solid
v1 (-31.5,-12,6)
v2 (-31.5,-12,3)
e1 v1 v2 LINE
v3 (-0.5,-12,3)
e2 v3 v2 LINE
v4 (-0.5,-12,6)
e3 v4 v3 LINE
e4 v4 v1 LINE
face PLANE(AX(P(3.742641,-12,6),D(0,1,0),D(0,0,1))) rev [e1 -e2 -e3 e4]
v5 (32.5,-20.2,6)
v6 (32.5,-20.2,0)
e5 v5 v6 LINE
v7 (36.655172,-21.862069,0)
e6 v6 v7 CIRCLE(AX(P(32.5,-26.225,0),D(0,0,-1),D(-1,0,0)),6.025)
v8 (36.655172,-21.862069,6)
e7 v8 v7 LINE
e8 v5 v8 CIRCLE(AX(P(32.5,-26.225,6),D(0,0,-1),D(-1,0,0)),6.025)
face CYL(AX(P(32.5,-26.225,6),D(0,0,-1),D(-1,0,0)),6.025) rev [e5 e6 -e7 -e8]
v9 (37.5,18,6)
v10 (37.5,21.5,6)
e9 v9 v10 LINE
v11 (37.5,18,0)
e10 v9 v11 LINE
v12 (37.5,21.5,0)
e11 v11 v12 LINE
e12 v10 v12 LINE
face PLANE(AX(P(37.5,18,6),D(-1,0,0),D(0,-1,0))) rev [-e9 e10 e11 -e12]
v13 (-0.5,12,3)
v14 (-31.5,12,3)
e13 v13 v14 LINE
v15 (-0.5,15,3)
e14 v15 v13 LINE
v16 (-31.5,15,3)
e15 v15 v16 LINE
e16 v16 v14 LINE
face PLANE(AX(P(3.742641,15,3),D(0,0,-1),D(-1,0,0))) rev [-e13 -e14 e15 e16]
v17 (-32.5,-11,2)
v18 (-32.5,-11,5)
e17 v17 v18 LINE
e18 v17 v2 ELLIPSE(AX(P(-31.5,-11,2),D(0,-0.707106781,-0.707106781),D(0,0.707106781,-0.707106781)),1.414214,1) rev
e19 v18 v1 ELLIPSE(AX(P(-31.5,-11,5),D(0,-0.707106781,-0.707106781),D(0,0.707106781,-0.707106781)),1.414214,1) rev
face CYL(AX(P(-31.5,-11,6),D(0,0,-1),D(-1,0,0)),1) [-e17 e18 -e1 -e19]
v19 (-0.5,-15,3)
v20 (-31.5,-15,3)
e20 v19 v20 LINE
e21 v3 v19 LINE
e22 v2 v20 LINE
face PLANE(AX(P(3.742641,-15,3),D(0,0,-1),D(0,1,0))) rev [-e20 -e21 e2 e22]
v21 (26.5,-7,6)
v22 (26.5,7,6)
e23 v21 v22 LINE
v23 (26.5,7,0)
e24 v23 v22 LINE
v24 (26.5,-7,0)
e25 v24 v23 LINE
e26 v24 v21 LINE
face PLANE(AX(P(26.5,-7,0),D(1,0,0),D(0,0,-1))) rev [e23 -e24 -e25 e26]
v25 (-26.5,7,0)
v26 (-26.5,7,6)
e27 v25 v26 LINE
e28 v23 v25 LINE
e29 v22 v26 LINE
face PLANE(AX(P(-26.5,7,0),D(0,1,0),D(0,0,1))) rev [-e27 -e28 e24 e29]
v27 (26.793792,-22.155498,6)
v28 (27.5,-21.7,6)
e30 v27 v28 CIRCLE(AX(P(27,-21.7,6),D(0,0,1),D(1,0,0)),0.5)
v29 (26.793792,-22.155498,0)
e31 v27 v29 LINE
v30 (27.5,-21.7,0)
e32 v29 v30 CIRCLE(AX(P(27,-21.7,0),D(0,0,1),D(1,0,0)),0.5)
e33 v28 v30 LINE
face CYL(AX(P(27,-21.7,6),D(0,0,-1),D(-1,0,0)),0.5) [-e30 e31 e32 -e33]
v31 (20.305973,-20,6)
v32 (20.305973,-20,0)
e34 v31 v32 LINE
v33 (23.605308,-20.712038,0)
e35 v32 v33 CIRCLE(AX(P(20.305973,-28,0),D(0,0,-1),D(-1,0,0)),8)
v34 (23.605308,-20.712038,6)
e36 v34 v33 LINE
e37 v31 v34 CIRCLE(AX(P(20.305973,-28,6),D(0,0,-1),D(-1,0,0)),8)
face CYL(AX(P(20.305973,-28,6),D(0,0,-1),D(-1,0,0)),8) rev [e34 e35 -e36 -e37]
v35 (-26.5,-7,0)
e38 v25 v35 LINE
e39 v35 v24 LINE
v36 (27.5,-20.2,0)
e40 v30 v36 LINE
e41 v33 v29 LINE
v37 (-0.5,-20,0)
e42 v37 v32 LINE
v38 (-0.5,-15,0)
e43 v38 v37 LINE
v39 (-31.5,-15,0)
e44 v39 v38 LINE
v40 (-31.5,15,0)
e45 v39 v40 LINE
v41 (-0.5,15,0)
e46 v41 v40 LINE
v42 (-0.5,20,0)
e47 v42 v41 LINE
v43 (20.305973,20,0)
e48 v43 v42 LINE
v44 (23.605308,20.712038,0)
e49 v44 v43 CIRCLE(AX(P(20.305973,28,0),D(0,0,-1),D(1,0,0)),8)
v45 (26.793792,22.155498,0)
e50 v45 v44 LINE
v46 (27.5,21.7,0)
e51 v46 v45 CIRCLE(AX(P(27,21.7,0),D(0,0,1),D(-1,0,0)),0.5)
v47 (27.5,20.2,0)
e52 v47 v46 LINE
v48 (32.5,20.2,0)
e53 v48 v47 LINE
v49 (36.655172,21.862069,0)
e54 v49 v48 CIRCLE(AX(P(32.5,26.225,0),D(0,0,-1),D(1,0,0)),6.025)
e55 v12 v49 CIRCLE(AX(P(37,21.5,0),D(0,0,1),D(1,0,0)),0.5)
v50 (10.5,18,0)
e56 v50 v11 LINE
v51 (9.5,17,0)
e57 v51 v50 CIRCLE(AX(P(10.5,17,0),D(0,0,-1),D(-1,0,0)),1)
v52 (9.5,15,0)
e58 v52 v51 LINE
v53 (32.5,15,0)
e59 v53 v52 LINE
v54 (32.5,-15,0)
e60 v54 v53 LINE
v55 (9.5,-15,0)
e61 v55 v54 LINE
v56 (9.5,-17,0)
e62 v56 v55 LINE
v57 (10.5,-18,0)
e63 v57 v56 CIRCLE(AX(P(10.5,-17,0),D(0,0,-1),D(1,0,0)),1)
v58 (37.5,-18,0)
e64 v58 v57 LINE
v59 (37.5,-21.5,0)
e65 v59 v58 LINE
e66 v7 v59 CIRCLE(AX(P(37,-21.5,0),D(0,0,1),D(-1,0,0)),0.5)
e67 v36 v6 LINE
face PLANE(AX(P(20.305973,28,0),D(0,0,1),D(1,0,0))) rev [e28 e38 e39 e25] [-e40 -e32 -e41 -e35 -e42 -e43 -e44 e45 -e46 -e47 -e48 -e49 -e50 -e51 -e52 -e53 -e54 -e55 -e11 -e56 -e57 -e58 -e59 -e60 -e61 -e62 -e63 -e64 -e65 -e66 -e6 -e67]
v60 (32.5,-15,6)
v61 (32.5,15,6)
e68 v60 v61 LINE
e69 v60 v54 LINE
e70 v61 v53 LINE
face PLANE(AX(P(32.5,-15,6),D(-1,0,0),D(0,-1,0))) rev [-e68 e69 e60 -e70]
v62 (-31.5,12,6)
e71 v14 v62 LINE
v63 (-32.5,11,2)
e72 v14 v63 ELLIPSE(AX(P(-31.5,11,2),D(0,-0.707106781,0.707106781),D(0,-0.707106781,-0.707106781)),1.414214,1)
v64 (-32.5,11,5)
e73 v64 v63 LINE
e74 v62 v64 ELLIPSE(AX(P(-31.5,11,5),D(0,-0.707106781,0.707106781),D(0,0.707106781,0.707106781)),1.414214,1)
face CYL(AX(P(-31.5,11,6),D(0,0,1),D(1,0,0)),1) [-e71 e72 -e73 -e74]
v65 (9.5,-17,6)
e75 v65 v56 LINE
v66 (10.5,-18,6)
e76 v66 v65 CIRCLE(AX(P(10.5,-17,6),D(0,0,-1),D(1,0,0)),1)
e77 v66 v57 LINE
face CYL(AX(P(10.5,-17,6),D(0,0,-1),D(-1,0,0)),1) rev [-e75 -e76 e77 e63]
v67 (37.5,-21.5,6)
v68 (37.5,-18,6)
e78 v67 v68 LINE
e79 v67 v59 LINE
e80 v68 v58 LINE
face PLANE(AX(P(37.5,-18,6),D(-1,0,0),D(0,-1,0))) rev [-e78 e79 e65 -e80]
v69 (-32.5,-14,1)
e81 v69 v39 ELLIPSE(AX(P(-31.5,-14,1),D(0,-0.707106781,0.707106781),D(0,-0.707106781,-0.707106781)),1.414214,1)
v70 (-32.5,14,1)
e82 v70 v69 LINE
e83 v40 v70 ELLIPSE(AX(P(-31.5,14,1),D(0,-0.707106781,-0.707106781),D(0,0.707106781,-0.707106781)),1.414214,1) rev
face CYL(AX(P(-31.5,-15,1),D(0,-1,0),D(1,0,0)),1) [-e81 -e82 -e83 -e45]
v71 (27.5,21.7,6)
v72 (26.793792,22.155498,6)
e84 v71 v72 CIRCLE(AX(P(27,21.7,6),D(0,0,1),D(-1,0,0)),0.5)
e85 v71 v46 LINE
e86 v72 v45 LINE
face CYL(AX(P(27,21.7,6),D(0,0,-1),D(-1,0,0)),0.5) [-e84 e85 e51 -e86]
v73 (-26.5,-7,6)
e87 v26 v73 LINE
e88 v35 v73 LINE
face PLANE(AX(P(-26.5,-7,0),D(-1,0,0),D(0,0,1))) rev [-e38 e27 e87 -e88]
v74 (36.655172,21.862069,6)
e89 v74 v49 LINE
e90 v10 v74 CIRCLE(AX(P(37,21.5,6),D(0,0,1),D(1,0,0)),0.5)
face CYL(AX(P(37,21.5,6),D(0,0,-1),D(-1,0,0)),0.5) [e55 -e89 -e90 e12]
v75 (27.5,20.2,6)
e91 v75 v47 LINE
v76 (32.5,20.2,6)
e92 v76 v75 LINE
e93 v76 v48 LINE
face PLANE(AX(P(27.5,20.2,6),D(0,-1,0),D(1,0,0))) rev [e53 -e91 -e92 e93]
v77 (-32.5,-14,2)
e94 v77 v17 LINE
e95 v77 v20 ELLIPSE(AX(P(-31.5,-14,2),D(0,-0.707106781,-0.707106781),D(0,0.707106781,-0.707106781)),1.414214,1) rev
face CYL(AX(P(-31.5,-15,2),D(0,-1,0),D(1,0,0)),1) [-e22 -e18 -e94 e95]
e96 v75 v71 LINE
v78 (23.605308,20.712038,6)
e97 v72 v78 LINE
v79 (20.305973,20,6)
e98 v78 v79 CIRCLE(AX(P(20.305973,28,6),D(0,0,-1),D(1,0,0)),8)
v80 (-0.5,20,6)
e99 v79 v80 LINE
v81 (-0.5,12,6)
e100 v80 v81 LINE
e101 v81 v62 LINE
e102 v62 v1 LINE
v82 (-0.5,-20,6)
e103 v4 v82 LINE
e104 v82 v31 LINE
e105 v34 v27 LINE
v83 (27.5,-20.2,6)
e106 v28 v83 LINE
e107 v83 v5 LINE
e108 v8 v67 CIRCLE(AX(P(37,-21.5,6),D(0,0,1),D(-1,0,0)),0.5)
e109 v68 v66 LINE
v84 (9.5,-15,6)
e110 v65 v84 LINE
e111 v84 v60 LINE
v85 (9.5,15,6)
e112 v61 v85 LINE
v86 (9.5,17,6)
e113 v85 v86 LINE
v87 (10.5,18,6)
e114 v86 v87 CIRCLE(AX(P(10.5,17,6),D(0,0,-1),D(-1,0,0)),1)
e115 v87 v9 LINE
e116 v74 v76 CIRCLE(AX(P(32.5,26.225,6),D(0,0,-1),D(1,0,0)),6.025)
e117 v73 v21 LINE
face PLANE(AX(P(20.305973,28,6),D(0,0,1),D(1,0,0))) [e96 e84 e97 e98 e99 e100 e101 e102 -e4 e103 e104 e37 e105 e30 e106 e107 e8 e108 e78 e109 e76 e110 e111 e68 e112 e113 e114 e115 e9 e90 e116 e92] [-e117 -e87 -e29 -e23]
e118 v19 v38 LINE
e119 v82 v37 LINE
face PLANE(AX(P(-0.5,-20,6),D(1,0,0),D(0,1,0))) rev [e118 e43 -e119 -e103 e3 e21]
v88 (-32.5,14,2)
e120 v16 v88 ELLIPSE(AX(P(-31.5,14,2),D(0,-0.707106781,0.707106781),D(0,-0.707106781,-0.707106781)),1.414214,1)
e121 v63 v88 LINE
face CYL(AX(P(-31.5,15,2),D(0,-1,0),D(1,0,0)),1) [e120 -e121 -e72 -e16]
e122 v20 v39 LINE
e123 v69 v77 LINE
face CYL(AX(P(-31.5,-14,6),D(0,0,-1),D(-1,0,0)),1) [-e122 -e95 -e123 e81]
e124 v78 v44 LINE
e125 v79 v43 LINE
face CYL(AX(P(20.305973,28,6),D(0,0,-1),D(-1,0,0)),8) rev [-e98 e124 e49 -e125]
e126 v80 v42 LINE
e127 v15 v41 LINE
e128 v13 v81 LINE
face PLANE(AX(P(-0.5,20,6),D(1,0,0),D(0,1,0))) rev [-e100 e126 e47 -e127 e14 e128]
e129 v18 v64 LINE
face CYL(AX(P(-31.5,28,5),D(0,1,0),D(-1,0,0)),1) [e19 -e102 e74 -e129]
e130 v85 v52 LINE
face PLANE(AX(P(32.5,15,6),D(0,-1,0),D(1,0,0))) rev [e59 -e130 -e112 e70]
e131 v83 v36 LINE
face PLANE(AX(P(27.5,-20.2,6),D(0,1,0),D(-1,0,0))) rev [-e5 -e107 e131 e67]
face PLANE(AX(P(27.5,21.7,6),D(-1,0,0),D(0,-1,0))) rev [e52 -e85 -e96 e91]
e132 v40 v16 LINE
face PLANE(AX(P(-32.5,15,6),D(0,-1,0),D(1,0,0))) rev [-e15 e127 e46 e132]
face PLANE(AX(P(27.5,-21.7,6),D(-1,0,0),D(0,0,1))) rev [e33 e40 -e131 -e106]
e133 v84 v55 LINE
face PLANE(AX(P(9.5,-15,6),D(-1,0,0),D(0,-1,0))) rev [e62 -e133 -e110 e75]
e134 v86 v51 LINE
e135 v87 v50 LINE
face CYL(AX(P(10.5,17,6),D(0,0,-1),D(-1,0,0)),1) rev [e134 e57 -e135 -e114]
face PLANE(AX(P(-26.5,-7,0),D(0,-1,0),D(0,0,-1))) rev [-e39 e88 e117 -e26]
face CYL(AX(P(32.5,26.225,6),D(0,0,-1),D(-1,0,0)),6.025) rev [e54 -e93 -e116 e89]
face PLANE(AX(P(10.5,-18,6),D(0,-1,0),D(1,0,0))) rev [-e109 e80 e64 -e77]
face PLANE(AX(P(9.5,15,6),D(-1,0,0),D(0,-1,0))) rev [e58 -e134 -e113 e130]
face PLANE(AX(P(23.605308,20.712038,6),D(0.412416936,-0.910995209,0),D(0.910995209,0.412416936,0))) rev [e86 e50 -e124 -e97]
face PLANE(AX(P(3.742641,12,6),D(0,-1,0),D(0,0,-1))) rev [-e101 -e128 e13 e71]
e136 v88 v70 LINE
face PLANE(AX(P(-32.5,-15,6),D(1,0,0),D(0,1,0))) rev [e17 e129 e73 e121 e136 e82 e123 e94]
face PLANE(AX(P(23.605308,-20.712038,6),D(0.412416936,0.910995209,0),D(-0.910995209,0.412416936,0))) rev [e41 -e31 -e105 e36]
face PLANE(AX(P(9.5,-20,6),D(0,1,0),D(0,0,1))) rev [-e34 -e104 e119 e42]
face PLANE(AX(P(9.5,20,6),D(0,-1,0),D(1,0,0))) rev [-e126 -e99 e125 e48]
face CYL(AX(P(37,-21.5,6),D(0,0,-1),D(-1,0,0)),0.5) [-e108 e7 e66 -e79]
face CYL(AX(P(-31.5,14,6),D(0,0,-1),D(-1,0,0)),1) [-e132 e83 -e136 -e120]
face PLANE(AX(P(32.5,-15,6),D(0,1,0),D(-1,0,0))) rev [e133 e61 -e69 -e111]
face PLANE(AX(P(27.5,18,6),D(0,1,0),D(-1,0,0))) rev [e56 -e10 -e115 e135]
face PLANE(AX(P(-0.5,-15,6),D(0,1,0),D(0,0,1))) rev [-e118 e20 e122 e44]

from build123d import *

# Parameters (mm, degrees)
BOSS_EXTRUDE1_DEPTH = 6
SKETCH4_W           = 3
SKETCH4_H           = 3
CUT_EXTRUDE2_DEPTH  = 32
FILLET1_R           = 1
SKETCH6_W           = 53
SKETCH6_H           = 14
CUT_EXTRUDE4_DEPTH  = 44.989657875


with BuildPart() as part:
    # Sketch1 → Boss-Extrude1 (new body)
    with BuildSketch(Plane(origin=(0, 0, 0), x_dir=(0, 1, 0), z_dir=(0, 0, 1))):
        with BuildLine():
            Line((-15, -9.5), (-17, -9.5))
            ThreePointArc((-17, -9.5), (-17.707106781, -9.792893219), (-18, -10.5))
            Line((-18, -10.5), (-18, -27.5))
            Line((-18, -27.5), (-18, -37.5))
            Line((-18, -37.5), (-21.5, -37.5))
            ThreePointArc((-21.5, -37.5), (-21.959572515, -37.196959649), (-21.862068966, -36.655172414))
            ThreePointArc((-21.862068966, -36.655172414), (-20.630927937, -34.737628825), (-20.2, -32.5))
            Line((-20.2, -32.5), (-20.2, -27.5))
            Line((-20.2, -27.5), (-21.7, -27.5))
            ThreePointArc((-21.7, -27.5), (-22.120181053, -27.271012699), (-22.155497604, -26.793791532))
            Line((-22.155497604, -26.793791532), (-20.712038328, -23.6053083))
            ThreePointArc((-20.712038328, -23.6053083), (-20.180035378, -21.993620083), (-20, -20.305972812))
            Line((-20, -20.305972812), (-20, -9.5))
            Line((-20, -9.5), (-20, 0.5))
            Line((-20, 0.5), (-15, 0.5))
            Line((-15, 0.5), (-15, 32.5))
            Line((-15, 32.5), (15, 32.5))
            Line((15, 32.5), (15, 0.5))
            Line((15, 0.5), (20, 0.5))
            Line((20, 0.5), (20, -9.5))
            Line((20, -9.5), (20, -20.305972812))
            ThreePointArc((20, -20.305972812), (20.180035378, -21.993620083), (20.712038328, -23.6053083))
            Line((20.712038328, -23.6053083), (22.155497604, -26.793791532))
            ThreePointArc((22.155497604, -26.793791532), (22.120181053, -27.271012699), (21.7, -27.5))
            Line((21.7, -27.5), (20.2, -27.5))
            Line((20.2, -27.5), (20.2, -32.5))
            ThreePointArc((20.2, -32.5), (20.630927937, -34.737628825), (21.862068966, -36.655172414))
            ThreePointArc((21.862068966, -36.655172414), (21.959572515, -37.196959649), (21.5, -37.5))
            Line((21.5, -37.5), (18, -37.5))
            Line((18, -37.5), (18, -27.5))
            Line((18, -27.5), (18, -10.5))
            ThreePointArc((18, -10.5), (17.707106781, -9.792893219), (17, -9.5))
            Line((17, -9.5), (15, -9.5))
            Line((15, -9.5), (15, -32.5))
            Line((15, -32.5), (-15, -32.5))
            Line((-15, -32.5), (-15, -9.5))
        make_face()
    extrude(amount=BOSS_EXTRUDE1_DEPTH)

    # Sketch4 → Cut-Extrude2 (cut)
    with BuildSketch(Plane(origin=(-32.5, 0, 0), x_dir=(0, -1, 0), z_dir=(-1, 0, 0))):
        with Locations((-13.5, 4.5)):
            Rectangle(SKETCH4_W, SKETCH4_H)
        with Locations((13.5, 4.5)):
            Rectangle(SKETCH4_W, SKETCH4_H)
    extrude(amount=-CUT_EXTRUDE2_DEPTH, mode=Mode.SUBTRACT)

    # Fillet1
    fillet1_edges = [part.edges().sort_by_distance(p)[0] for p in [
        (-32.5, 0, 6),
        (-32.5, -15, 1.5),
        (-32.5, 15, 1.5),
        (-32.5, 13.5, 3),
        (-32.5, 12, 4.5),
        (-32.5, -12, 4.5),
        (-32.5, -13.5, 3),
        (-32.5, 0, 0),
    ]]
    fillet(fillet1_edges, radius=FILLET1_R)

    # Sketch6 → Cut-Extrude4 (cut, through all)
    with BuildSketch(Plane.XY.offset(6)):
        Rectangle(SKETCH6_W, SKETCH6_H)
    extrude(amount=-CUT_EXTRUDE4_DEPTH, mode=Mode.SUBTRACT)


solid = part.part
